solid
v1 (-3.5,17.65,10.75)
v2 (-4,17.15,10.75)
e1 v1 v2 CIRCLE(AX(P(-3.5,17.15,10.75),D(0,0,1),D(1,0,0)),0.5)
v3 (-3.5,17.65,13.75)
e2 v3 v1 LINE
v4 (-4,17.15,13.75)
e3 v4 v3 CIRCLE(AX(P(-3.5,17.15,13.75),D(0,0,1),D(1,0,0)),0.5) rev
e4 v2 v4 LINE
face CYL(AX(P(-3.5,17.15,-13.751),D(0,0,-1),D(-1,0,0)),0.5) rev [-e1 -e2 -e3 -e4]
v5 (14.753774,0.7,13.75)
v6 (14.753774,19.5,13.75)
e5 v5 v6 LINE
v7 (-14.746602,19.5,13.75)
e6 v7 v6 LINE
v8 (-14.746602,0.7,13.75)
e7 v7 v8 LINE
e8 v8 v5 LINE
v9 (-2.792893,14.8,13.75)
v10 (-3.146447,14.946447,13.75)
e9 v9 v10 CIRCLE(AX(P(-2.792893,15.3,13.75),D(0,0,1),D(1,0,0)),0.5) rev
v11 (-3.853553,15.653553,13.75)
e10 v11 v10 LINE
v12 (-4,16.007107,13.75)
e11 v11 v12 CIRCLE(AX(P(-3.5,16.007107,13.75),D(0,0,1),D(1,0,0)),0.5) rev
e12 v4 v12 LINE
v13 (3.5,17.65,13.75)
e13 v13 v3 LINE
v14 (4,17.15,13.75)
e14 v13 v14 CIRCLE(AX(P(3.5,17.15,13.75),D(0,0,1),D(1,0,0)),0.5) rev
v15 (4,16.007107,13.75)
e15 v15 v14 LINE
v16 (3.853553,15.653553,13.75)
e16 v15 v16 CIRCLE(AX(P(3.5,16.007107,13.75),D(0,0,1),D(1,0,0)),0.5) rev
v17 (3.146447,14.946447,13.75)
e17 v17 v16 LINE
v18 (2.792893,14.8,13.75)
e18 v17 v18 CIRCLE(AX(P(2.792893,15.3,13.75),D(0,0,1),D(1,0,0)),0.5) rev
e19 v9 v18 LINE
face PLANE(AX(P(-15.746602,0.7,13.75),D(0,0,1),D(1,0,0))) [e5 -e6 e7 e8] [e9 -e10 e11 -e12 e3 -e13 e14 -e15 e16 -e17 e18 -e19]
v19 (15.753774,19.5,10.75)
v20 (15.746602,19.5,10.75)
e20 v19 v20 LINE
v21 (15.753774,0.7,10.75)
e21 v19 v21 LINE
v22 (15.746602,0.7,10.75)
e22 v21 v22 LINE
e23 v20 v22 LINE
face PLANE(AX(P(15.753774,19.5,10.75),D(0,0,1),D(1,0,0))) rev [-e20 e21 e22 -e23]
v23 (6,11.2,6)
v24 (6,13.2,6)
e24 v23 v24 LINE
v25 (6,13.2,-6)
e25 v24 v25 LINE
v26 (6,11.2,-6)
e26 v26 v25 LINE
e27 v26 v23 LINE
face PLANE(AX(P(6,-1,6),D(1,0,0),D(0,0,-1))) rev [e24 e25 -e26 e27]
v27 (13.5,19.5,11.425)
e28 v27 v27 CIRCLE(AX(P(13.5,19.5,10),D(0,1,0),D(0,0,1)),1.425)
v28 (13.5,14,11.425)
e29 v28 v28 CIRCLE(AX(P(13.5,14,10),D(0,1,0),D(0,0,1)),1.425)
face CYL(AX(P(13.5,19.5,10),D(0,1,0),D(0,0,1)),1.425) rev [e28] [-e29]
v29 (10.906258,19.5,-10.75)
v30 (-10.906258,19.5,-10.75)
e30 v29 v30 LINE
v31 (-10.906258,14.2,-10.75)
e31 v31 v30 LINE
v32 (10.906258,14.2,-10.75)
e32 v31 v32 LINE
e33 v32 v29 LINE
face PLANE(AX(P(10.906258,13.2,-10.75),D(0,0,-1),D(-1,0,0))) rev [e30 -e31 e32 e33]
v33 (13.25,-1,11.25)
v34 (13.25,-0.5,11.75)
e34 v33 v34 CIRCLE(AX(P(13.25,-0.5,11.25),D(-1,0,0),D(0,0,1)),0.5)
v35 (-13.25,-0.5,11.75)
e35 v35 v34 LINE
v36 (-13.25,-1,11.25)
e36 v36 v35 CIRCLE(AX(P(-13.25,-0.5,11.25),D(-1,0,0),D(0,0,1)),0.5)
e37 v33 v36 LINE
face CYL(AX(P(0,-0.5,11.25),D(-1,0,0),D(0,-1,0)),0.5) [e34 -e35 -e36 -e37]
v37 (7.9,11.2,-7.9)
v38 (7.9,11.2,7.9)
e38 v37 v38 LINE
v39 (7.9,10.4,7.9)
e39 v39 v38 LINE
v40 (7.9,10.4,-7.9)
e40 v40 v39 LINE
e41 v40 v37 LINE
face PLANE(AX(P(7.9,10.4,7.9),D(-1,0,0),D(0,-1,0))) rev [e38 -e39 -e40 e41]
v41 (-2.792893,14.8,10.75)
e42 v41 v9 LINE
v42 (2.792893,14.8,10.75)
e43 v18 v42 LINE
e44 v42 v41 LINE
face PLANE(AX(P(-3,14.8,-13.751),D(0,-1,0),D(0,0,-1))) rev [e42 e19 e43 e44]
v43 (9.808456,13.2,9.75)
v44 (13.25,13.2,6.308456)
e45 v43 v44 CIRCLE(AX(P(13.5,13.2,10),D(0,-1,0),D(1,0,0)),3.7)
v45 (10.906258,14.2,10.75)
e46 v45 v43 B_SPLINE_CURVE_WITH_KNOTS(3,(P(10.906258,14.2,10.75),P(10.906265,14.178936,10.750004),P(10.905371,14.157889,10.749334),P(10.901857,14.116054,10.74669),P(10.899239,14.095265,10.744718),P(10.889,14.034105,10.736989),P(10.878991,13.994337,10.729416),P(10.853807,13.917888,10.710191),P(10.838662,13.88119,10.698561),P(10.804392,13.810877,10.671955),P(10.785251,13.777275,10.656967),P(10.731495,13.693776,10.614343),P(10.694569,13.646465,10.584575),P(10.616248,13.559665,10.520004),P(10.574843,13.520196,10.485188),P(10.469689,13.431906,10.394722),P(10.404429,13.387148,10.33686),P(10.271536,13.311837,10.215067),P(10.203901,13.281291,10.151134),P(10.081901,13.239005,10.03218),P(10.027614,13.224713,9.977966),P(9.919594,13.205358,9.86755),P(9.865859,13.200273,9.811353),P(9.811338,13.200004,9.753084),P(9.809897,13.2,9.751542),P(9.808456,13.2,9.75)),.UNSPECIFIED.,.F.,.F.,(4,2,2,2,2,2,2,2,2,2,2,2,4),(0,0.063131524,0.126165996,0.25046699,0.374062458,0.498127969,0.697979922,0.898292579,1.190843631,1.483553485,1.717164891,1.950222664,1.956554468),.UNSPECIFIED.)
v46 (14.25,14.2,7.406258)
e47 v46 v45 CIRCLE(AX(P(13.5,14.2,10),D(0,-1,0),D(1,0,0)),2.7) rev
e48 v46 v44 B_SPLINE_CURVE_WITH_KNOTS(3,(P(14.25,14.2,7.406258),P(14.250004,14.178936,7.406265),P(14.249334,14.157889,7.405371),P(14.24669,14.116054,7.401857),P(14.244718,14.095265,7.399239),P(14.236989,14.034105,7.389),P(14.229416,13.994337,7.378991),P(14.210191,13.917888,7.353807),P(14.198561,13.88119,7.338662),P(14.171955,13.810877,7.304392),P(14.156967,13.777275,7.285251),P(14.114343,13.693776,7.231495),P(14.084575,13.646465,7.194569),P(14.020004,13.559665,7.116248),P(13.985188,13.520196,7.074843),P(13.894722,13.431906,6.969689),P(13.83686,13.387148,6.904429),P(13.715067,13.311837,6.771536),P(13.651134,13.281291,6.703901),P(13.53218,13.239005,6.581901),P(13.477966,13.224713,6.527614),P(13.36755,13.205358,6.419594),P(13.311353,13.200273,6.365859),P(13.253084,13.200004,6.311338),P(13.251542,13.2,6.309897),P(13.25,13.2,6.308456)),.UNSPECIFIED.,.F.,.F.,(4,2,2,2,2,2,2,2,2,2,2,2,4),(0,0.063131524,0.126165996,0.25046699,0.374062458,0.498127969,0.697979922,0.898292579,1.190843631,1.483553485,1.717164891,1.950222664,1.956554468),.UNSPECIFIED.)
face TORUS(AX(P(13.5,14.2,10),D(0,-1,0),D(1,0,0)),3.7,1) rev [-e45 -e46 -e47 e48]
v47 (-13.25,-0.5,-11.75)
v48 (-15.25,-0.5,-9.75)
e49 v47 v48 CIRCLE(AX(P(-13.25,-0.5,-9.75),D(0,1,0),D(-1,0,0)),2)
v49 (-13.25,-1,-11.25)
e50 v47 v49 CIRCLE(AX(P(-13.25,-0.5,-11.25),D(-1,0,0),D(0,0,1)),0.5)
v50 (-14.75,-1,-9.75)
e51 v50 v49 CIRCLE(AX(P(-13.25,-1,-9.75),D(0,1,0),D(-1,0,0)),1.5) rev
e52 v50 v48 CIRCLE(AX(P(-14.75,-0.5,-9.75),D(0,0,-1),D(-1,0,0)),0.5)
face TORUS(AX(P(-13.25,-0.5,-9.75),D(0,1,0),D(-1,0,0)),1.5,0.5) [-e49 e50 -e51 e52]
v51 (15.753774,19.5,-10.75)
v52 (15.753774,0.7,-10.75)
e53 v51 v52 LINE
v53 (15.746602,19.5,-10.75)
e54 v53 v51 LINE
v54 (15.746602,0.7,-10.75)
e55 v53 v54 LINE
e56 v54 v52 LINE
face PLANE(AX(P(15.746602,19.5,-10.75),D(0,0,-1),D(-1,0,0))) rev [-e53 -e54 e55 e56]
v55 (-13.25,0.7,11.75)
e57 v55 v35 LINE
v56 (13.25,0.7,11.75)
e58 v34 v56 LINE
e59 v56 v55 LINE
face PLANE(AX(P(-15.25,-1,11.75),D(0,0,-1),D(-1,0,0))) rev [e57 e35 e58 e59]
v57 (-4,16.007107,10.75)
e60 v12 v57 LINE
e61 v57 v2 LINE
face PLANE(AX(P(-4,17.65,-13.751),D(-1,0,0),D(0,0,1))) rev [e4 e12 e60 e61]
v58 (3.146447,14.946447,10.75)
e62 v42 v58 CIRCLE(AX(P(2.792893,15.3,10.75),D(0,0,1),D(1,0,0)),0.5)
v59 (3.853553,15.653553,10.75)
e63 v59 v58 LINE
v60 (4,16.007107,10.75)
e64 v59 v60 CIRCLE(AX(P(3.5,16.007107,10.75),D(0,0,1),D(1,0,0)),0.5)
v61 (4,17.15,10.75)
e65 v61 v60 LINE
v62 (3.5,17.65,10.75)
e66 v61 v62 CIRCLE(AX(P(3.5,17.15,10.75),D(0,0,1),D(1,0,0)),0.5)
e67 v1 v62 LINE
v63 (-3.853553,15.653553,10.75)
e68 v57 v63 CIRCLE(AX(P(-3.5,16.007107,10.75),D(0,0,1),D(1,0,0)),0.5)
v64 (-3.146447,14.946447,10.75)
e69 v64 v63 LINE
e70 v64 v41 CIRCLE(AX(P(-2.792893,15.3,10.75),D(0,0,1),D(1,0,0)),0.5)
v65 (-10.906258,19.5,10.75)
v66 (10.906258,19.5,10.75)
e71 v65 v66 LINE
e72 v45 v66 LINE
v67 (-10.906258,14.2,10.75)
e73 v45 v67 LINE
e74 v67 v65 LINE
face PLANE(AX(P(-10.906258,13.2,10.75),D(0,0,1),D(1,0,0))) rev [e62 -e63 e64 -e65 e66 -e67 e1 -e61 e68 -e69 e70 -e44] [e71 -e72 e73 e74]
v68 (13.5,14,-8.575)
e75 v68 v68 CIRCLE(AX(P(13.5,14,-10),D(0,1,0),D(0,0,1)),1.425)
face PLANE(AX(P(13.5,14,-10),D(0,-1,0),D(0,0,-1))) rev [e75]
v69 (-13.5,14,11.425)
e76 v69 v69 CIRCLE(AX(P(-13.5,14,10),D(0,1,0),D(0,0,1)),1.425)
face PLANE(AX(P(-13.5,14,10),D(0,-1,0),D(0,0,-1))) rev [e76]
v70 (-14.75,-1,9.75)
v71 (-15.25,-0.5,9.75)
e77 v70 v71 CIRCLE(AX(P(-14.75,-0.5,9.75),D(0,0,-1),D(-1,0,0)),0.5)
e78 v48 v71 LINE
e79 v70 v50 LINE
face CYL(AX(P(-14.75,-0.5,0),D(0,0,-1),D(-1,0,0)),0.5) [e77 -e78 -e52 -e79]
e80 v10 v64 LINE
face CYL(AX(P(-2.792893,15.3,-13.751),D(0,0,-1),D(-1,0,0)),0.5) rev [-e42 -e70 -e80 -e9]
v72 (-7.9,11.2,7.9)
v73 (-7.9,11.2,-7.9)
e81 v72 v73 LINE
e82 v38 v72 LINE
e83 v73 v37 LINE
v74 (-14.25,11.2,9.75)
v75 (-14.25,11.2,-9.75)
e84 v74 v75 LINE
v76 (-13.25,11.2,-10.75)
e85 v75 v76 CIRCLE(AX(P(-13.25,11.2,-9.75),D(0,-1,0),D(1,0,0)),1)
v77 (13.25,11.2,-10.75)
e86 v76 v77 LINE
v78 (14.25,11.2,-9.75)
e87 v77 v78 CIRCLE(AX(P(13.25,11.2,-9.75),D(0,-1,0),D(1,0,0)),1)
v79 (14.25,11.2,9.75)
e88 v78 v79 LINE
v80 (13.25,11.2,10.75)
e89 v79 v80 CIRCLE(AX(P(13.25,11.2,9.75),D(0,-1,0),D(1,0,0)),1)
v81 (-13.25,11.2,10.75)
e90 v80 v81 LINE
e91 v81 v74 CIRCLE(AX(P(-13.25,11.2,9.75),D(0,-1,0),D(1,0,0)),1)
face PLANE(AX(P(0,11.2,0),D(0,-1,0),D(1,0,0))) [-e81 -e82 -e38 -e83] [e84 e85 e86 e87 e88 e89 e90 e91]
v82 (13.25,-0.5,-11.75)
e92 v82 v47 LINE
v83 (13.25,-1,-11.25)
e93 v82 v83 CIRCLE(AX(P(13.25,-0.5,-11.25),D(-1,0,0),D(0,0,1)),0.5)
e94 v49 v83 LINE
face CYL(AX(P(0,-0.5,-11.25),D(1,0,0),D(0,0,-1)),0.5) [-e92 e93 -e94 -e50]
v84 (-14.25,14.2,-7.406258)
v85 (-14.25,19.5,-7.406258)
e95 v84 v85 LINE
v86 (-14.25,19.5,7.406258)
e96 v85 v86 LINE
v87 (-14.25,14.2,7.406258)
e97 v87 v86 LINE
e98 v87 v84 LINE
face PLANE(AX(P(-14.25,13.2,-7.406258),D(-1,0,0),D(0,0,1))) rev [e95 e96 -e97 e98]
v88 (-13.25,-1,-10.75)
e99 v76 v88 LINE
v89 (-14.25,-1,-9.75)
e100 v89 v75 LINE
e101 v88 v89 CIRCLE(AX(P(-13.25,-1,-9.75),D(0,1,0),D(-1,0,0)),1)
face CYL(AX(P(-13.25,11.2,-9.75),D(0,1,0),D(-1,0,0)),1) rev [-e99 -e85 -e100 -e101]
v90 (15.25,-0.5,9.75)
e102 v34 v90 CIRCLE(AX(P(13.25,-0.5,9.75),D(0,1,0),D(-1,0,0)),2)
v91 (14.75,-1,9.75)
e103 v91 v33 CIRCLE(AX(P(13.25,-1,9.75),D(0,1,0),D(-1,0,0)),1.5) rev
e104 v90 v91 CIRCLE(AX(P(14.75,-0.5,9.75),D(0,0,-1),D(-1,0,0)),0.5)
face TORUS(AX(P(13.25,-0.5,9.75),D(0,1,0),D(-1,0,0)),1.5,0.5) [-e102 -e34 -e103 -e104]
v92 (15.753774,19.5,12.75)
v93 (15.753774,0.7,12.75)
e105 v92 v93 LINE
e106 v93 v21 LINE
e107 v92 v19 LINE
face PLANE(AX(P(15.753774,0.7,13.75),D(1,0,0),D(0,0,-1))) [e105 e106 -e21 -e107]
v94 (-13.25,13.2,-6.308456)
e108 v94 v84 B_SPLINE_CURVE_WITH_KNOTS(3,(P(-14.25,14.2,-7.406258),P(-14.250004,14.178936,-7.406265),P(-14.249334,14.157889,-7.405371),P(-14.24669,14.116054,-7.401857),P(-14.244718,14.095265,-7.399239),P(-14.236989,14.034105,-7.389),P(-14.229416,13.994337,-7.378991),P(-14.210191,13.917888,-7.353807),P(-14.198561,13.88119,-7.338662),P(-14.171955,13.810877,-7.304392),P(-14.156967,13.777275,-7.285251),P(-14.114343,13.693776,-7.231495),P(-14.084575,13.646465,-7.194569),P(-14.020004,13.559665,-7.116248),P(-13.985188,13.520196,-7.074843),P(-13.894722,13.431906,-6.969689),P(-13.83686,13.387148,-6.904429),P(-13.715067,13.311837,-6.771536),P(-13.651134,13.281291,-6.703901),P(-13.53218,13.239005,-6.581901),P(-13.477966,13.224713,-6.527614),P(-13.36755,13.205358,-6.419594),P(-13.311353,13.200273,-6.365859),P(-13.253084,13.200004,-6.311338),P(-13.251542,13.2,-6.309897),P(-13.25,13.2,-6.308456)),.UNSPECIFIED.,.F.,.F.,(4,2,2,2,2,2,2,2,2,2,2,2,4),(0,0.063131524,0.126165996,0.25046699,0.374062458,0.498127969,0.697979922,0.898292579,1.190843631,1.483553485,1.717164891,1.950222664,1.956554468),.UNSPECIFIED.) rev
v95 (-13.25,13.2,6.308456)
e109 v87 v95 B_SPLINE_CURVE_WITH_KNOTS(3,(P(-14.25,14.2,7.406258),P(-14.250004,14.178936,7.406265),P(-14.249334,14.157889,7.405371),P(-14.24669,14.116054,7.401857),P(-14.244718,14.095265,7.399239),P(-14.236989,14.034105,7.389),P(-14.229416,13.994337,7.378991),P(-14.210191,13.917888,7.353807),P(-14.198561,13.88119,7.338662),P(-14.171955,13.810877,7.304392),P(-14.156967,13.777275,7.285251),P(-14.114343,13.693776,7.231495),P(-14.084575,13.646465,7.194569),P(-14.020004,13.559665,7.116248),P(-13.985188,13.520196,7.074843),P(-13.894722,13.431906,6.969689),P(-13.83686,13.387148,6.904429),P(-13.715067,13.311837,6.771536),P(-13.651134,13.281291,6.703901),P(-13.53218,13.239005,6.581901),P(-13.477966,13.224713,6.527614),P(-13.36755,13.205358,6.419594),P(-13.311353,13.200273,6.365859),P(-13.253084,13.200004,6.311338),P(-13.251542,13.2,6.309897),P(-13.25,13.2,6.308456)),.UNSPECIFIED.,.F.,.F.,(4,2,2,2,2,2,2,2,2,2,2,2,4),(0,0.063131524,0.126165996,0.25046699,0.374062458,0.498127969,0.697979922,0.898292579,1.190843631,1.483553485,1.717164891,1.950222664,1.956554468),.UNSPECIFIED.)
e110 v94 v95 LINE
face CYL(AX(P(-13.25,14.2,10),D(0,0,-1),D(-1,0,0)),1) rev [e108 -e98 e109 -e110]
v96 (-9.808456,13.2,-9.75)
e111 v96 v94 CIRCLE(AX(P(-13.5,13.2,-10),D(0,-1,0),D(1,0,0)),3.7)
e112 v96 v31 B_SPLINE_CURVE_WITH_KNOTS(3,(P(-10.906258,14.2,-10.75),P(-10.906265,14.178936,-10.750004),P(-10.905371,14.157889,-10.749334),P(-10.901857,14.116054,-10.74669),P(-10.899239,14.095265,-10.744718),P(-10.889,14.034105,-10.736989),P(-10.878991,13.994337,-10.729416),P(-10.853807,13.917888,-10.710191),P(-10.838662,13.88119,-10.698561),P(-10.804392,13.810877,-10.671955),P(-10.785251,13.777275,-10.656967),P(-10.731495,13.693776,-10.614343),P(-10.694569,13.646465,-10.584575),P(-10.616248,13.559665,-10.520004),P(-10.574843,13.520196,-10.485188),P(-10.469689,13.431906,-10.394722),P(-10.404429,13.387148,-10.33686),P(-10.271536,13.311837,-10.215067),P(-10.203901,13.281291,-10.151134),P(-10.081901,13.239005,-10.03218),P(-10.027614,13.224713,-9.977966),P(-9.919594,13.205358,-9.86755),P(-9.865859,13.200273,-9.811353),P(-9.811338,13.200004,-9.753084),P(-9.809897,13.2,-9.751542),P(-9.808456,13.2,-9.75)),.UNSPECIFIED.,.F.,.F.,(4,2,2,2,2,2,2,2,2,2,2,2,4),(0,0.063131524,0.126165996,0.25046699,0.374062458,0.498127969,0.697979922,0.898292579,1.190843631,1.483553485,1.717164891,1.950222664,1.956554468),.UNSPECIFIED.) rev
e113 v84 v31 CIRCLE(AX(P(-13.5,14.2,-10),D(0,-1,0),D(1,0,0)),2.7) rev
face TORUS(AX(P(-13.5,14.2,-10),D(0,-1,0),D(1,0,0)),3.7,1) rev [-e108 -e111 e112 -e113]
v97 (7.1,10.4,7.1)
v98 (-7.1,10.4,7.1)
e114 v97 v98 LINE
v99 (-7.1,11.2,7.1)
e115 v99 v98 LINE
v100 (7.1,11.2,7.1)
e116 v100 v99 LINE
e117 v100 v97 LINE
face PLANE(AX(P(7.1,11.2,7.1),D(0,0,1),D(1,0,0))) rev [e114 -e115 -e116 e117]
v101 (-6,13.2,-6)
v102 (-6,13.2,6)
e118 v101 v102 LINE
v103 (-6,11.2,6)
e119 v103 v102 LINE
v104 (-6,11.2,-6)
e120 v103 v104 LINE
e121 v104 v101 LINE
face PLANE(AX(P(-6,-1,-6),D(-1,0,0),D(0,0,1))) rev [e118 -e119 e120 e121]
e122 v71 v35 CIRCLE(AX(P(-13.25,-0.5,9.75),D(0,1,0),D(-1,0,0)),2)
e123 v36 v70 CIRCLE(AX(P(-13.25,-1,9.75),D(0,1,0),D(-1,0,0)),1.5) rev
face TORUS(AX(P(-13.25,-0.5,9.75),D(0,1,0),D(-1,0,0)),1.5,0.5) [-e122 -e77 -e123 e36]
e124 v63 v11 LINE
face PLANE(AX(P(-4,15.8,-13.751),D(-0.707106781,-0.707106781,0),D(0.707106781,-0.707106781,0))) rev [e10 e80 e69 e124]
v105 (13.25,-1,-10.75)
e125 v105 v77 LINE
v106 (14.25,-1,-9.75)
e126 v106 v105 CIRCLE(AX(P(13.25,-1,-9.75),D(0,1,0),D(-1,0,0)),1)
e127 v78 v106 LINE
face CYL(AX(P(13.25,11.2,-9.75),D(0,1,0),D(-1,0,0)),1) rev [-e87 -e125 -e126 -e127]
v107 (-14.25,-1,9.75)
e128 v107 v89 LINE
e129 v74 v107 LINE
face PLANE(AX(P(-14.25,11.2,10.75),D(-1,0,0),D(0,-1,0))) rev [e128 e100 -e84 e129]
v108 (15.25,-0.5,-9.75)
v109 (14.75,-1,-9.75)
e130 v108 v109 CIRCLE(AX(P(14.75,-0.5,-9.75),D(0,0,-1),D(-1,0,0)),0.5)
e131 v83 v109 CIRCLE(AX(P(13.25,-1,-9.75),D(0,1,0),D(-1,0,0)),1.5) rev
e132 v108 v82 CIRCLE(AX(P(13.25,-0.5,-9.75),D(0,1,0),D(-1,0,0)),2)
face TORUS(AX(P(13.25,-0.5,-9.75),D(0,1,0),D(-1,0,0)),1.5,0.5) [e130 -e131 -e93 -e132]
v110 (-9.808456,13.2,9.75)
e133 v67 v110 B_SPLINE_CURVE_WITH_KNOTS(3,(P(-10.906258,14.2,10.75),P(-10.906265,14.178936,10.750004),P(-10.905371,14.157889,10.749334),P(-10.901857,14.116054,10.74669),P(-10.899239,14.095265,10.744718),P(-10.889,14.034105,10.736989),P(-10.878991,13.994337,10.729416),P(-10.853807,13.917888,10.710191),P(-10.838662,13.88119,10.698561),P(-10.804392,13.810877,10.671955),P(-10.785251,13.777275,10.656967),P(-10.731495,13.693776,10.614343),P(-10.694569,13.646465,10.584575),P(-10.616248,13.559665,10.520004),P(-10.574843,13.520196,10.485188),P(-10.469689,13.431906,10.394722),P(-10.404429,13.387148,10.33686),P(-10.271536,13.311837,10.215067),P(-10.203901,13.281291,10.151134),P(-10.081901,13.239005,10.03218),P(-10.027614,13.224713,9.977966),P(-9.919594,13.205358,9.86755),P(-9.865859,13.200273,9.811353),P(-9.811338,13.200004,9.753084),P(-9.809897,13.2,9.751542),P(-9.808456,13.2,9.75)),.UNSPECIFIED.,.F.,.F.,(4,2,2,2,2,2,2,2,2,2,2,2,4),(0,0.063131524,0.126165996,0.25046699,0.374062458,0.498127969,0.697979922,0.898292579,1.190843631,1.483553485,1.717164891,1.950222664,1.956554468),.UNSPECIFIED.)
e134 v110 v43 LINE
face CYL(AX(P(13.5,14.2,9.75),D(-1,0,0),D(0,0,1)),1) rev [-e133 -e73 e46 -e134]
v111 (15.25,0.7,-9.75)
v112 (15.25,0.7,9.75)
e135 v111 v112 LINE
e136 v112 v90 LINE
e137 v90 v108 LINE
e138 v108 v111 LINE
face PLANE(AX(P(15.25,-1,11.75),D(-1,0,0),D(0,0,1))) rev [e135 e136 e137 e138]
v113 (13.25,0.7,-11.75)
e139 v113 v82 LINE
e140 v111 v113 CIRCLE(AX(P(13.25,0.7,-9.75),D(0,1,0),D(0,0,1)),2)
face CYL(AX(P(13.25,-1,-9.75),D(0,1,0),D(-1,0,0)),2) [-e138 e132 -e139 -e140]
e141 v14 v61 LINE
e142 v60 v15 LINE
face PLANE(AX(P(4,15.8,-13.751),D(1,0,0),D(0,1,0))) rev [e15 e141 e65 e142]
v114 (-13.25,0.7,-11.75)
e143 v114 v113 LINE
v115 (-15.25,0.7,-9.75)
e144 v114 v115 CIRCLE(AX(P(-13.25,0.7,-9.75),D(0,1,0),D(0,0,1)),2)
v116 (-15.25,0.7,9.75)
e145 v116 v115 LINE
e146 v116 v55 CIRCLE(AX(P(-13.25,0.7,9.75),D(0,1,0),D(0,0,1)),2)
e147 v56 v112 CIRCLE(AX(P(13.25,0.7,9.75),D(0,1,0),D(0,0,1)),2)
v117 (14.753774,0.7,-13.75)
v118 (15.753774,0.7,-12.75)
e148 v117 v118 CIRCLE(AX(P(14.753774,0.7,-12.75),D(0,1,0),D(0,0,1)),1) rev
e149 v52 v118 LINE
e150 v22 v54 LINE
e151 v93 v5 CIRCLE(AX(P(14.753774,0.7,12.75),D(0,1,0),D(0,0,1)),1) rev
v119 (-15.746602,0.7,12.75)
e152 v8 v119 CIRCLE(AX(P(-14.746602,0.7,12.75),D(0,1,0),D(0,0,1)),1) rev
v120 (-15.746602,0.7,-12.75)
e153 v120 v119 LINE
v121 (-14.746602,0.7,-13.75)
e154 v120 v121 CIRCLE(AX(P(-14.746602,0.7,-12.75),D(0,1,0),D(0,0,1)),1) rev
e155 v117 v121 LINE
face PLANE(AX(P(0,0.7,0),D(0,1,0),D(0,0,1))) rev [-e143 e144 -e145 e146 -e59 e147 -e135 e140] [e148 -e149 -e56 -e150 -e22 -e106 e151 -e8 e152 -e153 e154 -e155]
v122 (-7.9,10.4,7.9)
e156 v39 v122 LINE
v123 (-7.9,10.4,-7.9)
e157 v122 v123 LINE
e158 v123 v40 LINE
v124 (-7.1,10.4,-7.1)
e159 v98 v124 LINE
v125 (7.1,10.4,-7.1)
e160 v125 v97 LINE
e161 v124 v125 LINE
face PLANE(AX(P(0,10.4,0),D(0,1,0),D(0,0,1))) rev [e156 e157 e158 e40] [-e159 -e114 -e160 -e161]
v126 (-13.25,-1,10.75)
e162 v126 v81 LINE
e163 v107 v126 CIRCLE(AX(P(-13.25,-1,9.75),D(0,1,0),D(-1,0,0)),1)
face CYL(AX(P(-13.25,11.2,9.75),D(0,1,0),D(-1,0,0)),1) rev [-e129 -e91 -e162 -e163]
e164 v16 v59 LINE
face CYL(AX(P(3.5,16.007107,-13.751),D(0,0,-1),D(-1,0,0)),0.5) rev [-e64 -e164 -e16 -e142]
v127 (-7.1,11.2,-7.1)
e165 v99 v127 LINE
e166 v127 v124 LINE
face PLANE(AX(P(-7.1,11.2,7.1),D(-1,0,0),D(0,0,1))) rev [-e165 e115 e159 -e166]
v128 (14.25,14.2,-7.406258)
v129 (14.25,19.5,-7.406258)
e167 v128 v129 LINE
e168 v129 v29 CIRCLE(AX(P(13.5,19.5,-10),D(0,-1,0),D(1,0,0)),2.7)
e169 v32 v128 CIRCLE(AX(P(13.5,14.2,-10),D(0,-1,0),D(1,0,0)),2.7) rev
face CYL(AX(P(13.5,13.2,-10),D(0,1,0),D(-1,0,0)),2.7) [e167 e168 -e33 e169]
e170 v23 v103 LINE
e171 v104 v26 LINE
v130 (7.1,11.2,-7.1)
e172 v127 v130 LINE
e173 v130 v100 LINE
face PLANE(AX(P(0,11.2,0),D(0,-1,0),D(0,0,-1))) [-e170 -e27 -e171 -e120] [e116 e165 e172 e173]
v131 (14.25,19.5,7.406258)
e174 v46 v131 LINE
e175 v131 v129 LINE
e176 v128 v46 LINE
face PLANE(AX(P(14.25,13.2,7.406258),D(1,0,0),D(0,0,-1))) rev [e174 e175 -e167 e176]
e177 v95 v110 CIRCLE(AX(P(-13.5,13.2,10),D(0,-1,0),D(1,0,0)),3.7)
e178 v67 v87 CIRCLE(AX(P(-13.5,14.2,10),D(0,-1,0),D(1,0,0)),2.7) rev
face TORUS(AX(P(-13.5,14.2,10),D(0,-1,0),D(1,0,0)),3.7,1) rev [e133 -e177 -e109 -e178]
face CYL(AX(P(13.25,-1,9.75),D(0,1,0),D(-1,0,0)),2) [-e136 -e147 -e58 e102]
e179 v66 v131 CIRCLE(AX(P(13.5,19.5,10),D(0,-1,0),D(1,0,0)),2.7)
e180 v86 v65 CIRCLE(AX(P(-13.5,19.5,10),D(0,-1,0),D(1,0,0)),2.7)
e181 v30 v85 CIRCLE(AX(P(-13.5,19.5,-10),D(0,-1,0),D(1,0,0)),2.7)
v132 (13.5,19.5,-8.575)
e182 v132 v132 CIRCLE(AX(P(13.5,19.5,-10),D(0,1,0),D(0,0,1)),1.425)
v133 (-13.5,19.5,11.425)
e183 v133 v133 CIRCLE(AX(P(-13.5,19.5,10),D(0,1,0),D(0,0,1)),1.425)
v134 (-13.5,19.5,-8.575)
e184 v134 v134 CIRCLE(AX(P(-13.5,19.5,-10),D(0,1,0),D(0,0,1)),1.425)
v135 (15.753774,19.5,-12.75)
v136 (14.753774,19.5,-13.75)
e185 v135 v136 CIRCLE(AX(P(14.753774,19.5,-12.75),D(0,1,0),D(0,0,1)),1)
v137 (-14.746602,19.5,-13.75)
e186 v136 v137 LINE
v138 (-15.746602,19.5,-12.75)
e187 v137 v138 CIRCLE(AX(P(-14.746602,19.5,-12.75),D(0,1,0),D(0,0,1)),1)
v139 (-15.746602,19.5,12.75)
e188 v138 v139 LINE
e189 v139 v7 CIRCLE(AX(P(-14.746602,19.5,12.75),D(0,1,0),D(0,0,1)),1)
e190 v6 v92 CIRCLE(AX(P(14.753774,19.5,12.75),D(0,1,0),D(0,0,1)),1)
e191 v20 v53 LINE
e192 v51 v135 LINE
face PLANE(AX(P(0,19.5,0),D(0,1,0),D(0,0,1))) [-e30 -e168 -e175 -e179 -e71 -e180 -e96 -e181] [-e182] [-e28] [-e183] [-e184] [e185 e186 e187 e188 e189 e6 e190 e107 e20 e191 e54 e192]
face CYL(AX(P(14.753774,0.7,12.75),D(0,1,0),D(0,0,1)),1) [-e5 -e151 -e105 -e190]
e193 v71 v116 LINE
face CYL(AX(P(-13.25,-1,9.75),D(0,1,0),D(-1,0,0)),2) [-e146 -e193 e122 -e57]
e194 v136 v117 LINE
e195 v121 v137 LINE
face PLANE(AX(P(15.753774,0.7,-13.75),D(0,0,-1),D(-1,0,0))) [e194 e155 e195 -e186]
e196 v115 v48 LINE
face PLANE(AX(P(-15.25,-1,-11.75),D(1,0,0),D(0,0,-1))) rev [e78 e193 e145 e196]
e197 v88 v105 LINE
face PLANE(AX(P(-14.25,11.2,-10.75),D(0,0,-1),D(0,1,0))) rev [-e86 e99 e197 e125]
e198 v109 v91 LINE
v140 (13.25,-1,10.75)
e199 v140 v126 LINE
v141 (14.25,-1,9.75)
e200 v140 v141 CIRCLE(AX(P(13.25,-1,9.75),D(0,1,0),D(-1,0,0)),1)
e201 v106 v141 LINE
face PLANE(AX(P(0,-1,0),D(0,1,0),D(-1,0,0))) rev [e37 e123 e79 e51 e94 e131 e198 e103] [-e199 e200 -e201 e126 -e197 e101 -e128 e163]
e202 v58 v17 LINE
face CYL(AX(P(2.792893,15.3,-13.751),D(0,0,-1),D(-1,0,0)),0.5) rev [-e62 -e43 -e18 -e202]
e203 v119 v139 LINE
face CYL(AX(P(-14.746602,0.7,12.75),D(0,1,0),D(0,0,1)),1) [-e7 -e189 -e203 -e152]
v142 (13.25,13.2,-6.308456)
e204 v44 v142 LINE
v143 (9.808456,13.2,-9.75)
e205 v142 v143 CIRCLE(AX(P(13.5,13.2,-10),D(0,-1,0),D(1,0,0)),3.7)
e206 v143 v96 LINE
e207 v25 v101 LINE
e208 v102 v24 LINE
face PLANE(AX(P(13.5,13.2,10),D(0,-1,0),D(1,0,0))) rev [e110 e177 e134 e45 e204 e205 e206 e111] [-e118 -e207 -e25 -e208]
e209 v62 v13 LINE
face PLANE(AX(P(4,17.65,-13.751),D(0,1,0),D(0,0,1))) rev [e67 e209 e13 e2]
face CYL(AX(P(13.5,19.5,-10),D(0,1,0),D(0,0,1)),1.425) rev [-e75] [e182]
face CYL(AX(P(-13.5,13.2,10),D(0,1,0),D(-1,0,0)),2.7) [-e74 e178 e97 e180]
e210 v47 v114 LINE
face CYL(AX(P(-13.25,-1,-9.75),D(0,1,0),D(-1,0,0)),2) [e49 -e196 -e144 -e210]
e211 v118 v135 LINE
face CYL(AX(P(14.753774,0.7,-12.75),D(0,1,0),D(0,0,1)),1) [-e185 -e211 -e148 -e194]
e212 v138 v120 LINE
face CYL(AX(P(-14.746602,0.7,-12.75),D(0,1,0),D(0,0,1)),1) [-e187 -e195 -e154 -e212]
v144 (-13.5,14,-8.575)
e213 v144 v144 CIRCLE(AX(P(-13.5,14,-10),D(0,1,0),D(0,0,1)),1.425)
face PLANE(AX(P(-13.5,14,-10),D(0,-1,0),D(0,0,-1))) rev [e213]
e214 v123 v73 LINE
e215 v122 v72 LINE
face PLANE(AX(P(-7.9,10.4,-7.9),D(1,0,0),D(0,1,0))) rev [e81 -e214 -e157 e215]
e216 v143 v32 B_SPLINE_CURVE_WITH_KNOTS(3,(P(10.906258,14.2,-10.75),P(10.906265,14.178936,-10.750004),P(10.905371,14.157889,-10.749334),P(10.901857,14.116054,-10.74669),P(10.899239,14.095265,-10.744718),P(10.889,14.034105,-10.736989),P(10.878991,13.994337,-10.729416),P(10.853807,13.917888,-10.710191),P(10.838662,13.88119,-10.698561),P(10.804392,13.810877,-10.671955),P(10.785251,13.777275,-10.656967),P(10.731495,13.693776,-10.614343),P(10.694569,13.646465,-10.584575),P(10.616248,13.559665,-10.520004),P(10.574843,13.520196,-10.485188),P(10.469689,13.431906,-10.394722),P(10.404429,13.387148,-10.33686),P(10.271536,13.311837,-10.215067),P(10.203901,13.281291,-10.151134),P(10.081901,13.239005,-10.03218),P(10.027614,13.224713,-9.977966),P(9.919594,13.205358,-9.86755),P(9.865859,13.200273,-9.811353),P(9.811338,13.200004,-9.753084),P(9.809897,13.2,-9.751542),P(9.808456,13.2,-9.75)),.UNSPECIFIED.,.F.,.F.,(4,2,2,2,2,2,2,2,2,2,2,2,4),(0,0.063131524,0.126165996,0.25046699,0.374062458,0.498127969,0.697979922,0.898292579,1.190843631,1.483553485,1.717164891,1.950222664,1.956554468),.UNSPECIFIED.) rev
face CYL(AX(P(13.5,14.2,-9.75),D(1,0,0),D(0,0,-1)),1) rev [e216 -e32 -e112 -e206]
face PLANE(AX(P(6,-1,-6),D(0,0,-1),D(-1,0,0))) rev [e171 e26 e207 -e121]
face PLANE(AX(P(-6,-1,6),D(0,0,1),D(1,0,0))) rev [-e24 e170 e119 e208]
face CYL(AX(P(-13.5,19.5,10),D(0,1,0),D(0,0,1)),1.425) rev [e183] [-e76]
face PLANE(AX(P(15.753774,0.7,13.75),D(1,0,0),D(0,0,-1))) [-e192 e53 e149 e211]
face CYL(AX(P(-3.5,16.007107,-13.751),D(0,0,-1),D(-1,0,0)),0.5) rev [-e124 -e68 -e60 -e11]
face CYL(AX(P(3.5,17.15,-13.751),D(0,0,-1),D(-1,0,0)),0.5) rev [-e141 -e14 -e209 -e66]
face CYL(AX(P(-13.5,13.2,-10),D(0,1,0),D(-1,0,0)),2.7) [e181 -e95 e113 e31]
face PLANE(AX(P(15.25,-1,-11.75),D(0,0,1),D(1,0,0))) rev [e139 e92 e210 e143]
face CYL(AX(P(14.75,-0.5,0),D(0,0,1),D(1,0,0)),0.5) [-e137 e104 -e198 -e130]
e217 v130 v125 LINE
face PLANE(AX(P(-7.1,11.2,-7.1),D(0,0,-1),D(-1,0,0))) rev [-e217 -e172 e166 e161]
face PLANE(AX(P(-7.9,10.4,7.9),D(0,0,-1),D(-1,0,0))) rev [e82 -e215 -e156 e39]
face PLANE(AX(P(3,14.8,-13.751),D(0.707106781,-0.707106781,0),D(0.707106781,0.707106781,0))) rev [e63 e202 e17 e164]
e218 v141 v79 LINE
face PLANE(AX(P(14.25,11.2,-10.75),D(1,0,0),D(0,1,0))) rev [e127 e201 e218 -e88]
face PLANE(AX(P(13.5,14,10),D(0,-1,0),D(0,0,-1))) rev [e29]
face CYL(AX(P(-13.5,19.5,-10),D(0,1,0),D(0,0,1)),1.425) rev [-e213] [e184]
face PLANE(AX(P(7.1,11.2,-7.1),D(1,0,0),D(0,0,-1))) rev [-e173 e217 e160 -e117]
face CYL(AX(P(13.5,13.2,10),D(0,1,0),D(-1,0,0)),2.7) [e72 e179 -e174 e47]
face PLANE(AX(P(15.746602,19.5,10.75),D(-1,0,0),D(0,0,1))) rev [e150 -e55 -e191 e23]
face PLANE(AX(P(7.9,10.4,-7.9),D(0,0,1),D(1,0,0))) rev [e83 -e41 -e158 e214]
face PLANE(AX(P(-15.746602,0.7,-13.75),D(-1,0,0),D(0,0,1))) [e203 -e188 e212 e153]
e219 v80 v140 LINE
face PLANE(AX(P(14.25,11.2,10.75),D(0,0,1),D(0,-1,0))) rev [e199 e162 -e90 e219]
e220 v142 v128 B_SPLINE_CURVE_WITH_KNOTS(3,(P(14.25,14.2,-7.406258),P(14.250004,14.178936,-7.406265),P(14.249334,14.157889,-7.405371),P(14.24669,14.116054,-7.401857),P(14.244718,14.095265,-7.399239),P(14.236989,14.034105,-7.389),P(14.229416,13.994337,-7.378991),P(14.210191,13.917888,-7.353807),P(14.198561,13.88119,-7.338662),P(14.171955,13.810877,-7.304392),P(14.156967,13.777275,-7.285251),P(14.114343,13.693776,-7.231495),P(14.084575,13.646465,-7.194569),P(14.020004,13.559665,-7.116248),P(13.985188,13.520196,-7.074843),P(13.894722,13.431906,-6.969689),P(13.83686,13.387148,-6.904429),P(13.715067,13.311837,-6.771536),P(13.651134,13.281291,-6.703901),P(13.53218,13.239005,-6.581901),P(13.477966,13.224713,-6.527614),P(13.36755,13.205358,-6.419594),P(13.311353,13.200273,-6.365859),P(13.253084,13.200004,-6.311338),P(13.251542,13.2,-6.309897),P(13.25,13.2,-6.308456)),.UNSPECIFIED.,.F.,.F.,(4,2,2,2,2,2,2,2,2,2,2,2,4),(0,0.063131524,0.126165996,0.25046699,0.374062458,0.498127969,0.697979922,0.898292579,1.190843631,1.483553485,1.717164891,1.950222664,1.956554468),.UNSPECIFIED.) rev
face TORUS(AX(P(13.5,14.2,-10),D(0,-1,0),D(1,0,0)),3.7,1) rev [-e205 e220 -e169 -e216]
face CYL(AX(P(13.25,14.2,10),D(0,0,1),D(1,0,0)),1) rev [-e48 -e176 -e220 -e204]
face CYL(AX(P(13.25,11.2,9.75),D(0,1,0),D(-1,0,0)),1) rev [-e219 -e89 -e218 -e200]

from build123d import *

# Parameters (mm, degrees)
SKETCH_1_W               = 31.500375693
SKETCH_1_H               = 27.5
EXTRUDE_1_DEPTH          = 18.8
SKETCH_2_W               = 0.007172267
SKETCH_2_H               = 21.5
CUT_EXTRUDE_1_DEPTH      = 18.8
SKETCH_3_W               = 30.5
SKETCH_3_H               = 23.5
EXTRUDE_2_DEPTH          = 1.7
SKETCH_4_W               = 28.5
SKETCH_4_H               = 21.5
CUT_EXTRUDE_2_DEPTH      = 12.2
SKETCH_5_W               = 15.8
SKETCH_5_H               = 15.8
EXTRUDE_3_DEPTH          = 0.8
CUT_EXTRUDE_3_DEPTH      = 6.3
SKETCH_7_W               = 14.2
SKETCH_7_H               = 14.2
CUT_EXTRUDE_4_DEPTH      = 0.8
SKETCH_8_W               = 12
SKETCH_8_H               = 12
CUT_EXTRUDE_5_DEPTH      = 26.276152686
CUT_EXTRUDE_6_REACH      = 39.211
HOLE_WIZARD_M2_5_1_D     = 2.85
HOLE_WIZARD_M2_5_1_DEPTH = 5.5
FILLET_1_R               = 2
FILLET_2_R               = 0.5
FILLET_3_R               = 1


with BuildPart() as part:
    # 草图1 → 凸台-拉伸1 (new body)
    with BuildSketch(Plane(origin=(0, 19.5, 0), x_dir=(1, 0, 0), z_dir=(0, 1, 0))):
        with Locations((0.003586134, 0)):
            Rectangle(SKETCH_1_W, SKETCH_1_H)
    extrude(amount=-EXTRUDE_1_DEPTH)

    # 草图2 → 切除-拉伸1 (cut)
    with BuildSketch(Plane.XZ.offset(-0.7)):
        with Locations((15.750187847, 0)):
            Rectangle(SKETCH_2_W, SKETCH_2_H)
    extrude(amount=-CUT_EXTRUDE_1_DEPTH, mode=Mode.SUBTRACT)

    # 草图3 → 凸台-拉伸2 (add)
    with BuildSketch(Plane.XZ.offset(-0.7)):
        Rectangle(SKETCH_3_W, SKETCH_3_H)
    extrude(amount=EXTRUDE_2_DEPTH)

    # 草图4 → 切除-拉伸2 (cut)
    with BuildSketch(Plane.XZ.offset(1)):
        Rectangle(SKETCH_4_W, SKETCH_4_H)
    extrude(amount=-CUT_EXTRUDE_2_DEPTH, mode=Mode.SUBTRACT)

    # 草图5 → 凸台-拉伸3 (add)
    with BuildSketch(Plane.XZ.offset(-11.2)):
        Rectangle(SKETCH_5_W, SKETCH_5_H)
    extrude(amount=EXTRUDE_3_DEPTH)

    # 草图6 → 切除-拉伸3 (cut)
    with BuildSketch(Plane(origin=(0, 19.5, 0), x_dir=(-1, 0, 0), z_dir=(0, 1, 0))):
        with BuildLine():
            Line((-14.25, 7.40625753), (-14.25, -7.40625753))
            ThreePointArc((-14.25, -7.40625753), (-11.590811691, -8.090811691), (-10.90625753, -10.75))
            Line((-10.90625753, -10.75), (10.90625753, -10.75))
            ThreePointArc((10.90625753, -10.75), (11.590811691, -8.090811691), (14.25, -7.40625753))
            Line((14.25, -7.40625753), (14.25, 7.40625753))
            ThreePointArc((14.25, 7.40625753), (11.590811691, 8.090811691), (10.90625753, 10.75))
            Line((10.90625753, 10.75), (-10.90625753, 10.75))
            ThreePointArc((-10.90625753, 10.75), (-11.590811691, 8.090811691), (-14.25, 7.40625753))
        make_face()
    extrude(amount=-CUT_EXTRUDE_3_DEPTH, mode=Mode.SUBTRACT)

    # 草图7 → 切除-拉伸4 (cut)
    with BuildSketch(Plane.XZ.offset(-10.4)):
        Rectangle(SKETCH_7_W, SKETCH_7_H)
    extrude(amount=-CUT_EXTRUDE_4_DEPTH, mode=Mode.SUBTRACT)

    # 草图8 → 切除-拉伸5 (cut, through all)
    with BuildSketch(Plane(origin=(0, 13.2, 0), x_dir=(-1, 0, 0), z_dir=(0, 1, 0))):
        Rectangle(SKETCH_8_W, SKETCH_8_H)
    extrude(amount=-CUT_EXTRUDE_5_DEPTH, mode=Mode.SUBTRACT)

    # 草图9 → 切除-拉伸6 (cut, up to next)
    with BuildSketch(Plane.XY.offset(13.75), mode=Mode.PRIVATE) as cut_extrude_6_sk1:
        Polygon((-4, 17.65), (-4, 15.8), (-3, 14.8), (3, 14.8), (4, 15.8), (4, 17.65), align=None)
    cut_extrude_6_tool1 = extrude(cut_extrude_6_sk1.sketch, amount=-CUT_EXTRUDE_6_REACH, mode=Mode.PRIVATE) & part.part
    add(cut_extrude_6_tool1.solids().sort_by_distance((0, 16.275076, 13.75))[0], mode=Mode.SUBTRACT)

    # M2.5 间隙孔1
    with Locations(Plane(origin=(0, 19.5, 0), x_dir=(1, 0, 0), z_dir=(0, 1, 0))):
        with Locations((13.5, 10), (13.5, -10), (-13.5, -10), (-13.5, 10)):
            Hole(HOLE_WIZARD_M2_5_1_D / 2, depth=HOLE_WIZARD_M2_5_1_DEPTH)

    # 圆角1
    fillet_1_edges = [part.edges().sort_by_distance(p)[0] for p in [
        (15.25, -0.15, -11.75),
        (15.25, -0.15, 11.75),
        (-15.25, -0.15, 11.75),
        (-15.25, -0.15, -11.75),
    ]]
    fillet(fillet_1_edges, radius=FILLET_1_R)

    # 圆角2
    fillet_2_edges = [part.edges().sort_by_distance(p)[0] for p in [
        (-4, 17.65, 12.25),
        (4, 17.65, 12.25),
        (4, 15.8, 12.25),
        (3, 14.8, 12.25),
        (-3, 14.8, 12.25),
        (-4, 15.8, 12.25),
        (-15.25, -1, 0),
        (0, -1, 11.75),
        (15.25, -1, 0),
        (0, -1, -11.75),
        (14.664213562, -1, -11.164213562),
        (-14.664213562, -1, -11.164213562),
        (14.664213562, -1, 11.164213562),
        (-14.664213562, -1, 11.164213562),
    ]]
    fillet(fillet_2_edges, radius=FILLET_2_R)

    # 圆角3
    # the kernel refuses this fillet: 1 mm, written as the material it adds along each edge
    with BuildSketch(Plane(origin=(-14.25, -1, 10.75), x_dir=(1, 0, 0), z_dir=(0, 1, 0))) as fillet_3_piece_1:
        with BuildLine():
            CenterArc((FILLET_3_R, FILLET_3_R), FILLET_3_R, 180, 90)
            Line((0, FILLET_3_R), (0, 0))
            Line((0, 0), (FILLET_3_R, 0))
        make_face()
    extrude(amount=14.7)
    with BuildSketch(Plane(origin=(14.25, -1, 10.75), x_dir=(-1, 0, 0), z_dir=(0, 1, 0)), Plane(origin=(14.25, -1, -10.75), x_dir=(0, 0, 1), z_dir=(0, 1, 0)), Plane(origin=(-14.25, -1, -10.75), x_dir=(1, 0, 0), z_dir=(0, 1, 0))) as fillet_3_piece_2:
        with BuildLine():
            CenterArc((FILLET_3_R, -FILLET_3_R), FILLET_3_R, 90, 90)
            Line((0, -FILLET_3_R), (0, 0))
            Line((0, 0), (FILLET_3_R, 0))
        make_face()
    extrude(amount=14.7)
    with BuildSketch(Plane(origin=(13.5, 13.2, 10), x_dir=(-0.3548034469093428, 0, 0.9349409147434126), z_dir=(0.9349409147434126, 0, 0.3548034469093428))) as fillet_3_piece_3_section:
        with BuildLine():
            CenterArc((2.7 + FILLET_3_R, -FILLET_3_R), FILLET_3_R, 90, 90)
            Line((2.7 + FILLET_3_R, 0), (2.7, 0))
            Line((2.7, 0), (2.7, -FILLET_3_R))
        make_face()
    fillet_3_piece_3 = revolve(axis=Axis((13.5, 13.2, 10), (0, -1, 0)), revolution_arc=228.43720284, mode=Mode.PRIVATE)
    fillet_3_piece_3 = split(fillet_3_piece_3, bisect_by=Plane(origin=(14.25, 13.485154119, 7.889177279), z_dir=(-1, 0, 0)), keep=Keep.TOP, mode=Mode.PRIVATE)
    add(fillet_3_piece_3)
    with BuildSketch(Plane(origin=(-13.40625753, 13.2, 10.75), x_dir=(0, 1, 0), z_dir=(1, 0, 0))) as fillet_3_piece_4_section:
        with BuildLine():
            CenterArc((FILLET_3_R, -FILLET_3_R), FILLET_3_R, 90, 90)
            Line((0, -FILLET_3_R), (0, 0))
            Line((0, 0), (FILLET_3_R, 0))
        make_face()
    fillet_3_piece_4 = extrude(amount=26.81251506, mode=Mode.PRIVATE)
    fillet_3_piece_4 = fillet_3_piece_4 - Plane(origin=(13.5, 14.049901013, 10), x_dir=(-0.9606453592105874, 0, 0.27777777777777996), z_dir=(0, 1, 0)) * Cylinder(2.7, 58, mode=Mode.PRIVATE)
    fillet_3_piece_4 = fillet_3_piece_4 - Plane(origin=(-13.5, 14.049901013, 10), x_dir=(-0.2777777777777764, 0, -0.9606453592105884), z_dir=(0, 1, 0)) * Cylinder(2.7, 58, mode=Mode.PRIVATE)
    add(fillet_3_piece_4)
    with BuildSketch(Plane(origin=(-13.5, 13.2, 10), x_dir=(-0.9349409147434112, 0, -0.35480344690934623), z_dir=(-0.35480344690934623, 0, 0.9349409147434112))) as fillet_3_piece_5_section:
        with BuildLine():
            CenterArc((2.7 + FILLET_3_R, -FILLET_3_R), FILLET_3_R, 90, 90)
            Line((2.7 + FILLET_3_R, 0), (2.7, 0))
            Line((2.7, 0), (2.7, -FILLET_3_R))
        make_face()
    fillet_3_piece_5 = revolve(axis=Axis((-13.5, 13.2, 10), (0, -1, 0)), revolution_arc=228.43720284, mode=Mode.PRIVATE)
    fillet_3_piece_5 = split(fillet_3_piece_5, bisect_by=Plane(origin=(-14.25, 13.485154119, 7.889177279), z_dir=(1, 0, 0)), keep=Keep.TOP, mode=Mode.PRIVATE)
    add(fillet_3_piece_5)
    with BuildSketch(Plane(origin=(-14.25, 13.2, -9.90625753), x_dir=(0, 1, 0), z_dir=(0, 0, 1))) as fillet_3_piece_6_section:
        with BuildLine():
            CenterArc((FILLET_3_R, -FILLET_3_R), FILLET_3_R, 90, 90)
            Line((0, -FILLET_3_R), (0, 0))
            Line((0, 0), (FILLET_3_R, 0))
        make_face()
    fillet_3_piece_6 = extrude(amount=19.81251506, mode=Mode.PRIVATE)
    fillet_3_piece_6 = fillet_3_piece_6 - Plane(origin=(-13.5, 14.049902267, 10), x_dir=(-0.2777777777777764, 0, -0.9606453592105884), z_dir=(0, 1, 0)) * Cylinder(2.7, 44, mode=Mode.PRIVATE)
    fillet_3_piece_6 = fillet_3_piece_6 - Plane(origin=(-13.5, 14.049902267, -10), x_dir=(-1, 0, 0), z_dir=(0, -1, 0)) * Cylinder(1.425, 44, mode=Mode.PRIVATE)
    add(fillet_3_piece_6)
    with BuildSketch(Plane(origin=(-13.5, 13.2, -10), x_dir=(0.35480344690934373, 0, -0.9349409147434123), z_dir=(-0.9349409147434123, 0, -0.35480344690934373))) as fillet_3_piece_7_section:
        with BuildLine():
            CenterArc((2.7 + FILLET_3_R, -FILLET_3_R), FILLET_3_R, 90, 90)
            Line((2.7 + FILLET_3_R, 0), (2.7, 0))
            Line((2.7, 0), (2.7, -FILLET_3_R))
        make_face()
    fillet_3_piece_7 = revolve(axis=Axis((-13.5, 13.2, -10), (0, -1, 0)), revolution_arc=228.43720284, mode=Mode.PRIVATE)
    fillet_3_piece_7 = split(fillet_3_piece_7, bisect_by=Plane(origin=(-14.25, 13.485154119, -7.889177279), z_dir=(1, 0, 0)), keep=Keep.TOP, mode=Mode.PRIVATE)
    add(fillet_3_piece_7)
    with BuildSketch(Plane(origin=(13.40625753, 13.2, -10.75), x_dir=(0, 1, 0), z_dir=(-1, 0, 0))) as fillet_3_piece_8_section:
        with BuildLine():
            CenterArc((FILLET_3_R, -FILLET_3_R), FILLET_3_R, 90, 90)
            Line((0, -FILLET_3_R), (0, 0))
            Line((0, 0), (FILLET_3_R, 0))
        make_face()
    fillet_3_piece_8 = extrude(amount=26.81251506, mode=Mode.PRIVATE)
    fillet_3_piece_8 = fillet_3_piece_8 - Plane(origin=(-13.5, 14.049901014, -10), x_dir=(-1, 0, 0), z_dir=(0, -1, 0)) * Cylinder(1.425, 58, mode=Mode.PRIVATE)
    fillet_3_piece_8 = fillet_3_piece_8 - Plane(origin=(13.5, 14.049901014, -10), x_dir=(-1, 0, 0), z_dir=(0, -1, 0)) * Cylinder(1.425, 58, mode=Mode.PRIVATE)
    add(fillet_3_piece_8)
    with BuildSketch(Plane(origin=(13.5, 13.2, -10), x_dir=(0.9349409147434106, 0, 0.3548034469093482), z_dir=(0.3548034469093482, 0, -0.9349409147434106))) as fillet_3_piece_9_section:
        with BuildLine():
            CenterArc((2.7 + FILLET_3_R, -FILLET_3_R), FILLET_3_R, 90, 90)
            Line((2.7 + FILLET_3_R, 0), (2.7, 0))
            Line((2.7, 0), (2.7, -FILLET_3_R))
        make_face()
    fillet_3_piece_9 = revolve(axis=Axis((13.5, 13.2, -10), (0, -1, 0)), revolution_arc=228.43720284, mode=Mode.PRIVATE)
    fillet_3_piece_9 = split(fillet_3_piece_9, bisect_by=Plane(origin=(14.25, 13.485154119, -7.889177279), z_dir=(-1, 0, 0)), keep=Keep.TOP, mode=Mode.PRIVATE)
    add(fillet_3_piece_9)
    with BuildSketch(Plane(origin=(14.25, 13.2, 9.90625753), x_dir=(0, 1, 0), z_dir=(0, 0, -1))) as fillet_3_piece_10_section:
        with BuildLine():
            CenterArc((FILLET_3_R, -FILLET_3_R), FILLET_3_R, 90, 90)
            Line((0, -FILLET_3_R), (0, 0))
            Line((0, 0), (FILLET_3_R, 0))
        make_face()
    fillet_3_piece_10 = extrude(amount=19.81251506, mode=Mode.PRIVATE)
    fillet_3_piece_10 = fillet_3_piece_10 - Plane(origin=(13.5, 14.049902266, 10), x_dir=(-0.9606453592105874, 0, 0.27777777777777996), z_dir=(0, 1, 0)) * Cylinder(2.7, 44, mode=Mode.PRIVATE)
    fillet_3_piece_10 = fillet_3_piece_10 - Plane(origin=(13.5, 14.049902266, -10), x_dir=(-1, 0, 0), z_dir=(0, -1, 0)) * Cylinder(1.425, 44, mode=Mode.PRIVATE)
    add(fillet_3_piece_10)
    # the kernel refuses this fillet: 1 mm, written as the material it takes off along each edge
    with BuildSketch(Plane(origin=(15.75377398, 22, -13.75), x_dir=(0, 0, 1), z_dir=(0, -1, 0)), Plane(origin=(15.75377398, 22, 13.75), x_dir=(-1, 0, 0), z_dir=(0, -1, 0)), Plane(origin=(-15.746601713, 22, -13.75), x_dir=(1, 0, 0), z_dir=(0, -1, 0))) as fillet_3_2_piece_1:
        with BuildLine():
            CenterArc((FILLET_3_R, FILLET_3_R), FILLET_3_R, 180, 90)
            Line((0, FILLET_3_R), (0, 0))
            Line((0, 0), (FILLET_3_R, 0))
        make_face()
    extrude(amount=23.8, mode=Mode.SUBTRACT)
    with BuildSketch(Plane(origin=(-15.746601713, 22, 13.75), x_dir=(1, 0, 0), z_dir=(0, -1, 0))) as fillet_3_2_piece_2:
        with BuildLine():
            CenterArc((FILLET_3_R, -FILLET_3_R), FILLET_3_R, 90, 90)
            Line((0, -FILLET_3_R), (0, 0))
            Line((0, 0), (FILLET_3_R, 0))
        make_face()
    extrude(amount=23.8, mode=Mode.SUBTRACT)


solid = part.part
